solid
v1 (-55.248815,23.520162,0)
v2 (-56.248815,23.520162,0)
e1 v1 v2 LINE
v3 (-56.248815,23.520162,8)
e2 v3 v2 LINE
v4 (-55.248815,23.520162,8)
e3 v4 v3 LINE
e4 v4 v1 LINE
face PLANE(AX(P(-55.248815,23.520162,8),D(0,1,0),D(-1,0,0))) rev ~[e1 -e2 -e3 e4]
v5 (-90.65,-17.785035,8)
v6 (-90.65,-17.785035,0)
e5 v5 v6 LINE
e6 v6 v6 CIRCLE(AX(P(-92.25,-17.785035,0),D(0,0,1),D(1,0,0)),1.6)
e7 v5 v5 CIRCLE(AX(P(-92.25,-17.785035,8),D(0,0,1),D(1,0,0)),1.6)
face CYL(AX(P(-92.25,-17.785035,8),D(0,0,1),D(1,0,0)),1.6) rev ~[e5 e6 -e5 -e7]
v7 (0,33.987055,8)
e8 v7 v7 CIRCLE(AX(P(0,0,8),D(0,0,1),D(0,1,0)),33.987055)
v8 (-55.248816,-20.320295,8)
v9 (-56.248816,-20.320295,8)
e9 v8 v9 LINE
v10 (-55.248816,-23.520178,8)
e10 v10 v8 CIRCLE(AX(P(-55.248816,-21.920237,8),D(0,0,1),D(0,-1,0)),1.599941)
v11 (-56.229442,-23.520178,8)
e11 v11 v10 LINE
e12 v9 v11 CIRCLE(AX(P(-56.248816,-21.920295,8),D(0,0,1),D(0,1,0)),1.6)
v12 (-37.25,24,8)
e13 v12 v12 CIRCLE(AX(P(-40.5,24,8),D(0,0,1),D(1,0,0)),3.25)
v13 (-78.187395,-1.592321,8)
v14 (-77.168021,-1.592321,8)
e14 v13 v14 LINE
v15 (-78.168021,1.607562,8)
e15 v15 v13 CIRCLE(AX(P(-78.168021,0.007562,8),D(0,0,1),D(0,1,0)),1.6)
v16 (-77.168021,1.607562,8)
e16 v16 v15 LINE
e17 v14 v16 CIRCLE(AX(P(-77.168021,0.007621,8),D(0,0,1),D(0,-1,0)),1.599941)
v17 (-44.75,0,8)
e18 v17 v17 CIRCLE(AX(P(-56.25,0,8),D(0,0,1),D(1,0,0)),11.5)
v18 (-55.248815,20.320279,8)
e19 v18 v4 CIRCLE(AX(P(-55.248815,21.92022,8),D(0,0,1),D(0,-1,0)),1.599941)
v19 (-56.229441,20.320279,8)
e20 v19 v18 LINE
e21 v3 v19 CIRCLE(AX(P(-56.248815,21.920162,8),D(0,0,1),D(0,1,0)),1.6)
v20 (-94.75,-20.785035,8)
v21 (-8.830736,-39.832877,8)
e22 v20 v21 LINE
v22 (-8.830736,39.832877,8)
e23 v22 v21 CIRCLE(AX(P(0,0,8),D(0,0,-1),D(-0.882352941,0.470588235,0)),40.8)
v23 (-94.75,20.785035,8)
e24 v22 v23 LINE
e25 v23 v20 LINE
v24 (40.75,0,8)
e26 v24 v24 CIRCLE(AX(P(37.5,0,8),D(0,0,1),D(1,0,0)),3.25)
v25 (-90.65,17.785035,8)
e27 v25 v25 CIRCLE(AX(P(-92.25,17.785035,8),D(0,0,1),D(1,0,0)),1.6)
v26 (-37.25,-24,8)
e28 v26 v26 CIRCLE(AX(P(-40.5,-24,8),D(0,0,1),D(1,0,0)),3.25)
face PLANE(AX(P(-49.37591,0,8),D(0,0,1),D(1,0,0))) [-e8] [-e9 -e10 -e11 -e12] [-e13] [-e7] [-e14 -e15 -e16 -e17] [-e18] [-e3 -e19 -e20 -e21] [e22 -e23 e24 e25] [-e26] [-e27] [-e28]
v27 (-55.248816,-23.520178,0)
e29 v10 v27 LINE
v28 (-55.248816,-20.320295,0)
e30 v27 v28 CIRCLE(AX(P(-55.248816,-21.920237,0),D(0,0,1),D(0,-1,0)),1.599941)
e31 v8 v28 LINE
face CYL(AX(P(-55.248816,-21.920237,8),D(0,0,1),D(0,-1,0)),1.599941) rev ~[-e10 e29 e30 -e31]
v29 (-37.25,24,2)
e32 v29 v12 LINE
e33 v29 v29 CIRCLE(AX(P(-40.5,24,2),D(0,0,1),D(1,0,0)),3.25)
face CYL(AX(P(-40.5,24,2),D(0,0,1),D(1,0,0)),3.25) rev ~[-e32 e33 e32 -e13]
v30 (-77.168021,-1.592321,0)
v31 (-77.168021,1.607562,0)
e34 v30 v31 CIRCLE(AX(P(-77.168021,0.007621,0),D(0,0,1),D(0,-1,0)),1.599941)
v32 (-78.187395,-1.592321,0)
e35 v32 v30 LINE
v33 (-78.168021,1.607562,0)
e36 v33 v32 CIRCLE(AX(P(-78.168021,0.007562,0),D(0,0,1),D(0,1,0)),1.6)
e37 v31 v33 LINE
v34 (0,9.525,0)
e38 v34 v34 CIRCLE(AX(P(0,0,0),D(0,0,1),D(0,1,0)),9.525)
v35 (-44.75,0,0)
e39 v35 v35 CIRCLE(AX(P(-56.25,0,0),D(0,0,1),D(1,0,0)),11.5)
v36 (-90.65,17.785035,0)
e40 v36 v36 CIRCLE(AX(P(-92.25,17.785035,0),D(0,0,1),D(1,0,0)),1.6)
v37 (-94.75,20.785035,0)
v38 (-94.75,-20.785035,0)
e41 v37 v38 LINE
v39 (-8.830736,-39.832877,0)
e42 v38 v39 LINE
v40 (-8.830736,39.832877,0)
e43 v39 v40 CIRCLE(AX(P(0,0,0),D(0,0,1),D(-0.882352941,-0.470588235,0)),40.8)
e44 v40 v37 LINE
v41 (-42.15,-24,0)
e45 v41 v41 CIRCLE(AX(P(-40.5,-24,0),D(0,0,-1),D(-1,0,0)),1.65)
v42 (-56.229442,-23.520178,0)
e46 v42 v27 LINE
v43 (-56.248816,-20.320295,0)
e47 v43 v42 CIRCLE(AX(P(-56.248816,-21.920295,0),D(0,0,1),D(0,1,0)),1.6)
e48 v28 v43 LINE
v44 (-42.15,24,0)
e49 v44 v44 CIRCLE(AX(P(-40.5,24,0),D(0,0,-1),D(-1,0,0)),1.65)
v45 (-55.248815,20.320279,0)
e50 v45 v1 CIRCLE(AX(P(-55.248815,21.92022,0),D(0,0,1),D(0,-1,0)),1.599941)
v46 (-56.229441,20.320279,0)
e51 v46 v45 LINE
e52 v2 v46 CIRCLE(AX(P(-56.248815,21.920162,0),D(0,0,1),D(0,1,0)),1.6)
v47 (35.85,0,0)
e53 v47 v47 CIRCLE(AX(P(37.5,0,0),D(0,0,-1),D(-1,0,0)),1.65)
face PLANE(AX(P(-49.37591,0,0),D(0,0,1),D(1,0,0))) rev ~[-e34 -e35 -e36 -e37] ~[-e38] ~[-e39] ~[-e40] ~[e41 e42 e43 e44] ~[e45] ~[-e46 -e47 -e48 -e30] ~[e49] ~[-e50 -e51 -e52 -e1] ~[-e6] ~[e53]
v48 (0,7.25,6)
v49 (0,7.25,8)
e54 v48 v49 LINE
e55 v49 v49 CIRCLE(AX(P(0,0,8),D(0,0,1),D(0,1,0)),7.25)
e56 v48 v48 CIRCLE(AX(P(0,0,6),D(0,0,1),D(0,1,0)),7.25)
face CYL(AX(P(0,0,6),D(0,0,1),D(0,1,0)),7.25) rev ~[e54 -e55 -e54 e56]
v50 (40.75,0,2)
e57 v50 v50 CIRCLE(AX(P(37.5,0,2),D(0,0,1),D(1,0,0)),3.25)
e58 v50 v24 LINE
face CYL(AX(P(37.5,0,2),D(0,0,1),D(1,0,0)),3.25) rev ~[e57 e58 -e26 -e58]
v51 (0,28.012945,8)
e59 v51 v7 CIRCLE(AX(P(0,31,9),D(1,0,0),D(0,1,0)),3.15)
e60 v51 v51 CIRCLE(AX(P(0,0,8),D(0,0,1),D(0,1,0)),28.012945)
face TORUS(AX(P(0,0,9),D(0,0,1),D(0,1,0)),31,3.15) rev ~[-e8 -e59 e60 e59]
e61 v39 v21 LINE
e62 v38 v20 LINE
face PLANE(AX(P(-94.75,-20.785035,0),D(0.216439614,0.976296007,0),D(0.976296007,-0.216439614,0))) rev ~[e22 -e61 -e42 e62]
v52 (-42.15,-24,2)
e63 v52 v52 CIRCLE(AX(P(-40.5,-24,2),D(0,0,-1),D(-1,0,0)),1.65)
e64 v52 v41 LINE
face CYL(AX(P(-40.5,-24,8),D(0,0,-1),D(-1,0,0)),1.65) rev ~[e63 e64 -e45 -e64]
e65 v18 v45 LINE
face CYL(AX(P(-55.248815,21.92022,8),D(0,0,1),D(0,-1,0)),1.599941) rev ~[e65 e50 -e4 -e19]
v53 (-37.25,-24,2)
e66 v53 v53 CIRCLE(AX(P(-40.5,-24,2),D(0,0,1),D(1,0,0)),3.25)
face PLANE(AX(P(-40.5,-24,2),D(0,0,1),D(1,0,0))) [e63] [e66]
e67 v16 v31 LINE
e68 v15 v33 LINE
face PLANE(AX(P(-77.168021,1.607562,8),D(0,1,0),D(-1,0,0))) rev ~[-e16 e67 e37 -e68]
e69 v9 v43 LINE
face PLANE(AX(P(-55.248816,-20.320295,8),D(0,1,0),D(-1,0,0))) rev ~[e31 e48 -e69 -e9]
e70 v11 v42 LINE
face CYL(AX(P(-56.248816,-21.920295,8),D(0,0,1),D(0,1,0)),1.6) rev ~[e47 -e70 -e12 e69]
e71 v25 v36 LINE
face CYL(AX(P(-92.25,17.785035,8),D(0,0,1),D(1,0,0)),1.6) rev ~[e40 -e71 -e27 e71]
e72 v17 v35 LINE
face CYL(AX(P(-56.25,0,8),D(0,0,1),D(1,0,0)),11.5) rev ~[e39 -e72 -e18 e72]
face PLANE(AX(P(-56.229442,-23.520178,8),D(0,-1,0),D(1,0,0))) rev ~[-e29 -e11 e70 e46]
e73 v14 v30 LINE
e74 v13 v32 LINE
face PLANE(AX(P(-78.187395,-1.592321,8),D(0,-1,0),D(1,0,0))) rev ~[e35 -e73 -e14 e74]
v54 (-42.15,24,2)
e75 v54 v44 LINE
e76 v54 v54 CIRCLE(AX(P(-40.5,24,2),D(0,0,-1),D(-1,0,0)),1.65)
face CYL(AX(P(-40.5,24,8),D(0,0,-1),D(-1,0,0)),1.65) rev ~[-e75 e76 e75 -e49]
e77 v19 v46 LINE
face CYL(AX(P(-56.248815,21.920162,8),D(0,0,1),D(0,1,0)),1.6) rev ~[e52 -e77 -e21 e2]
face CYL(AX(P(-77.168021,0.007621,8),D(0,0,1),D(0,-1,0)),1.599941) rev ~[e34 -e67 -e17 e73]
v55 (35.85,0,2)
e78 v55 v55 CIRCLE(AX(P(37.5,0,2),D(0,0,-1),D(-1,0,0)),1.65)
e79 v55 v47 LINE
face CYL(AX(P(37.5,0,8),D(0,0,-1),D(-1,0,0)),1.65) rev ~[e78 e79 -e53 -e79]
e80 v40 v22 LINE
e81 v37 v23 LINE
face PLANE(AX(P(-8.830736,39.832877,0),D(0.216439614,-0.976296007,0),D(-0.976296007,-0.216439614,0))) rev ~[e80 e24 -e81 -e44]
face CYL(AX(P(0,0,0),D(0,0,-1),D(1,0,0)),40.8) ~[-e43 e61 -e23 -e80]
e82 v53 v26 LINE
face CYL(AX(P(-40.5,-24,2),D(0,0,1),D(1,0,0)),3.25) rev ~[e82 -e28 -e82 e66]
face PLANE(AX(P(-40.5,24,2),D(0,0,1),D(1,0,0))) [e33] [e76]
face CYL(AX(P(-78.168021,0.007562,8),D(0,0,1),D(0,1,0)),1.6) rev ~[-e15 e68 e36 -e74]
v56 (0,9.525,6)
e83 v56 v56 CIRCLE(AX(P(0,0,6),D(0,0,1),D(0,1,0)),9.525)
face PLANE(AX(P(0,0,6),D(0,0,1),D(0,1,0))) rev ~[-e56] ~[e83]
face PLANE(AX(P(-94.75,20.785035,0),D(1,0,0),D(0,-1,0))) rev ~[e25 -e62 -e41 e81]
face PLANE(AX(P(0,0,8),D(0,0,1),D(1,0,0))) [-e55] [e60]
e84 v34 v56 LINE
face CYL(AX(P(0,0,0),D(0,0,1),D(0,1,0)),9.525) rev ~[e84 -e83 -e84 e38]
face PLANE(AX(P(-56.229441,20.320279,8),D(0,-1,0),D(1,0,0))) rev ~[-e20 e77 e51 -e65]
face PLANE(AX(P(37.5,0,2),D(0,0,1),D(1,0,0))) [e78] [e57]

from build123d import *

# Parameters (mm, degrees)
F0_R            = 40.8
F1_DEPTH        = 8
F4_R            = 3.15
F6_W            = 4.8
F6_H            = 38.4
F7_DEPTH        = 8.001
F9_DEPTH        = 8
F10_R           = 11.5
F10_R_2         = 1.6
F11_DEPTH       = 8.001
F13_D           = 3.3
F13_CBORE_D     = 6.5
F13_CBORE_DEPTH = 6


# Not quite as in the source:
# - a feature names something its author has since deleted; it is built from what else it names


with BuildPart() as f1:
    # F0 (on Top) → F1 (new body)
    with BuildSketch(Plane.XY):
        Circle(F0_R)
    extrude(amount=F1_DEPTH)

    # F2 (on Right) → F3 (revolve, cut)
    with BuildSketch(Plane.YZ):
        Polygon((0, 8), (0, 0), (9.525, 0), (9.525, 6), (7.25, 6), (7.25, 8), align=None)
    revolve(axis=Axis((0, 0, 10.7360328796), (0, 0, 1)), mode=Mode.SUBTRACT)

    # F4 (on Right) → F5 (revolve, cut)
    with BuildSketch(Plane.YZ):
        with Locations((31, 9)):
            Circle(F4_R)
    revolve(axis=Axis((0, 0, 6.3867427816), (0, 0, 1)), mode=Mode.SUBTRACT)

    # F6 (on Top) → F7 (cut, through all)
    with BuildSketch(Plane.XY):
        with Locations((-38.4, 0)):
            Rectangle(F6_W, F6_H)
    extrude(amount=F7_DEPTH, mode=Mode.SUBTRACT)

    # F8 (on Top) → F9 (join, through all)
    with BuildSketch(Plane.XY):
        with BuildLine():
            Line((-94.75, 20.7850348986), (-94.75, -20.7850348986))
            Line((-94.75, -20.7850348986), (-8.8307362487, -39.8328770905))
            ThreePointArc((-8.8307362487, -39.8328770905), (-24.6754459414, -32.4924970969), (-36, -19.2))
            Line((-36, -19.2), (-36, 19.2))
            ThreePointArc((-36, 19.2), (-24.6754459414, 32.4924970969), (-8.8307362487, 39.8328770905))
            Line((-8.8307362487, 39.8328770905), (-94.75, 20.7850348986))
        make_face()
    extrude(amount=F9_DEPTH)

    # F10 (on face) → F11 (cut, through all)
    with BuildSketch(Plane.XY.offset(8)):
        with Locations((-56.25, 0)):
            Circle(F10_R)
        with Locations((-92.25, 17.7850348986)):
            Circle(F10_R_2)
        with Locations((-92.25, -17.7850348986)):
            Circle(F10_R_2)
        with BuildLine():
            Line((-55.2488153952, 23.5201616153), (-56.2488153952, 23.5201616153))
            ThreePointArc((-56.2488153952, 23.5201616153), (-57.848786069, 21.9104743704), (-56.2294412604, 20.3202789187))
            Line((-56.2294412604, 20.3202789187), (-55.2488153952, 20.3202789187))
            ThreePointArc((-55.2488153952, 20.3202789187), (-53.6488740469, 21.920220267), (-55.2488153952, 23.5201616153))
        make_face()
        with BuildLine():
            Line((-77.1680206657, 1.6075620275), (-78.1680206657, 1.6075620275))
            ThreePointArc((-78.1680206657, 1.6075620275), (-79.7679913396, 0.0172492724), (-78.1873948004, -1.5923206691))
            Line((-78.1873948004, -1.5923206691), (-77.1680206657, -1.5923206691))
            ThreePointArc((-77.1680206657, -1.5923206691), (-75.5680793174, 0.0076206792), (-77.1680206657, 1.6075620275))
        make_face()
        with BuildLine():
            Line((-55.2488164927, -20.3202952302), (-56.2488164927, -20.3202952302))
            ThreePointArc((-56.2488164927, -20.3202952302), (-57.8487871666, -21.9299824752), (-56.229442358, -23.5201779268))
            Line((-56.229442358, -23.5201779268), (-55.2488164927, -23.5201779268))
            ThreePointArc((-55.2488164927, -23.5201779268), (-53.6488751444, -21.9202365785), (-55.2488164927, -20.3202952302))
        make_face()
    extrude(amount=-F11_DEPTH, mode=Mode.SUBTRACT)

    # F13 (through all)
    with Locations(Plane.XY.offset(8)):
        with Locations((-40.5, 24), (-40.5, -24), (37.5, 0)):
            CounterBoreHole(F13_D / 2, F13_CBORE_D / 2, F13_CBORE_DEPTH)


solid = f1.part
